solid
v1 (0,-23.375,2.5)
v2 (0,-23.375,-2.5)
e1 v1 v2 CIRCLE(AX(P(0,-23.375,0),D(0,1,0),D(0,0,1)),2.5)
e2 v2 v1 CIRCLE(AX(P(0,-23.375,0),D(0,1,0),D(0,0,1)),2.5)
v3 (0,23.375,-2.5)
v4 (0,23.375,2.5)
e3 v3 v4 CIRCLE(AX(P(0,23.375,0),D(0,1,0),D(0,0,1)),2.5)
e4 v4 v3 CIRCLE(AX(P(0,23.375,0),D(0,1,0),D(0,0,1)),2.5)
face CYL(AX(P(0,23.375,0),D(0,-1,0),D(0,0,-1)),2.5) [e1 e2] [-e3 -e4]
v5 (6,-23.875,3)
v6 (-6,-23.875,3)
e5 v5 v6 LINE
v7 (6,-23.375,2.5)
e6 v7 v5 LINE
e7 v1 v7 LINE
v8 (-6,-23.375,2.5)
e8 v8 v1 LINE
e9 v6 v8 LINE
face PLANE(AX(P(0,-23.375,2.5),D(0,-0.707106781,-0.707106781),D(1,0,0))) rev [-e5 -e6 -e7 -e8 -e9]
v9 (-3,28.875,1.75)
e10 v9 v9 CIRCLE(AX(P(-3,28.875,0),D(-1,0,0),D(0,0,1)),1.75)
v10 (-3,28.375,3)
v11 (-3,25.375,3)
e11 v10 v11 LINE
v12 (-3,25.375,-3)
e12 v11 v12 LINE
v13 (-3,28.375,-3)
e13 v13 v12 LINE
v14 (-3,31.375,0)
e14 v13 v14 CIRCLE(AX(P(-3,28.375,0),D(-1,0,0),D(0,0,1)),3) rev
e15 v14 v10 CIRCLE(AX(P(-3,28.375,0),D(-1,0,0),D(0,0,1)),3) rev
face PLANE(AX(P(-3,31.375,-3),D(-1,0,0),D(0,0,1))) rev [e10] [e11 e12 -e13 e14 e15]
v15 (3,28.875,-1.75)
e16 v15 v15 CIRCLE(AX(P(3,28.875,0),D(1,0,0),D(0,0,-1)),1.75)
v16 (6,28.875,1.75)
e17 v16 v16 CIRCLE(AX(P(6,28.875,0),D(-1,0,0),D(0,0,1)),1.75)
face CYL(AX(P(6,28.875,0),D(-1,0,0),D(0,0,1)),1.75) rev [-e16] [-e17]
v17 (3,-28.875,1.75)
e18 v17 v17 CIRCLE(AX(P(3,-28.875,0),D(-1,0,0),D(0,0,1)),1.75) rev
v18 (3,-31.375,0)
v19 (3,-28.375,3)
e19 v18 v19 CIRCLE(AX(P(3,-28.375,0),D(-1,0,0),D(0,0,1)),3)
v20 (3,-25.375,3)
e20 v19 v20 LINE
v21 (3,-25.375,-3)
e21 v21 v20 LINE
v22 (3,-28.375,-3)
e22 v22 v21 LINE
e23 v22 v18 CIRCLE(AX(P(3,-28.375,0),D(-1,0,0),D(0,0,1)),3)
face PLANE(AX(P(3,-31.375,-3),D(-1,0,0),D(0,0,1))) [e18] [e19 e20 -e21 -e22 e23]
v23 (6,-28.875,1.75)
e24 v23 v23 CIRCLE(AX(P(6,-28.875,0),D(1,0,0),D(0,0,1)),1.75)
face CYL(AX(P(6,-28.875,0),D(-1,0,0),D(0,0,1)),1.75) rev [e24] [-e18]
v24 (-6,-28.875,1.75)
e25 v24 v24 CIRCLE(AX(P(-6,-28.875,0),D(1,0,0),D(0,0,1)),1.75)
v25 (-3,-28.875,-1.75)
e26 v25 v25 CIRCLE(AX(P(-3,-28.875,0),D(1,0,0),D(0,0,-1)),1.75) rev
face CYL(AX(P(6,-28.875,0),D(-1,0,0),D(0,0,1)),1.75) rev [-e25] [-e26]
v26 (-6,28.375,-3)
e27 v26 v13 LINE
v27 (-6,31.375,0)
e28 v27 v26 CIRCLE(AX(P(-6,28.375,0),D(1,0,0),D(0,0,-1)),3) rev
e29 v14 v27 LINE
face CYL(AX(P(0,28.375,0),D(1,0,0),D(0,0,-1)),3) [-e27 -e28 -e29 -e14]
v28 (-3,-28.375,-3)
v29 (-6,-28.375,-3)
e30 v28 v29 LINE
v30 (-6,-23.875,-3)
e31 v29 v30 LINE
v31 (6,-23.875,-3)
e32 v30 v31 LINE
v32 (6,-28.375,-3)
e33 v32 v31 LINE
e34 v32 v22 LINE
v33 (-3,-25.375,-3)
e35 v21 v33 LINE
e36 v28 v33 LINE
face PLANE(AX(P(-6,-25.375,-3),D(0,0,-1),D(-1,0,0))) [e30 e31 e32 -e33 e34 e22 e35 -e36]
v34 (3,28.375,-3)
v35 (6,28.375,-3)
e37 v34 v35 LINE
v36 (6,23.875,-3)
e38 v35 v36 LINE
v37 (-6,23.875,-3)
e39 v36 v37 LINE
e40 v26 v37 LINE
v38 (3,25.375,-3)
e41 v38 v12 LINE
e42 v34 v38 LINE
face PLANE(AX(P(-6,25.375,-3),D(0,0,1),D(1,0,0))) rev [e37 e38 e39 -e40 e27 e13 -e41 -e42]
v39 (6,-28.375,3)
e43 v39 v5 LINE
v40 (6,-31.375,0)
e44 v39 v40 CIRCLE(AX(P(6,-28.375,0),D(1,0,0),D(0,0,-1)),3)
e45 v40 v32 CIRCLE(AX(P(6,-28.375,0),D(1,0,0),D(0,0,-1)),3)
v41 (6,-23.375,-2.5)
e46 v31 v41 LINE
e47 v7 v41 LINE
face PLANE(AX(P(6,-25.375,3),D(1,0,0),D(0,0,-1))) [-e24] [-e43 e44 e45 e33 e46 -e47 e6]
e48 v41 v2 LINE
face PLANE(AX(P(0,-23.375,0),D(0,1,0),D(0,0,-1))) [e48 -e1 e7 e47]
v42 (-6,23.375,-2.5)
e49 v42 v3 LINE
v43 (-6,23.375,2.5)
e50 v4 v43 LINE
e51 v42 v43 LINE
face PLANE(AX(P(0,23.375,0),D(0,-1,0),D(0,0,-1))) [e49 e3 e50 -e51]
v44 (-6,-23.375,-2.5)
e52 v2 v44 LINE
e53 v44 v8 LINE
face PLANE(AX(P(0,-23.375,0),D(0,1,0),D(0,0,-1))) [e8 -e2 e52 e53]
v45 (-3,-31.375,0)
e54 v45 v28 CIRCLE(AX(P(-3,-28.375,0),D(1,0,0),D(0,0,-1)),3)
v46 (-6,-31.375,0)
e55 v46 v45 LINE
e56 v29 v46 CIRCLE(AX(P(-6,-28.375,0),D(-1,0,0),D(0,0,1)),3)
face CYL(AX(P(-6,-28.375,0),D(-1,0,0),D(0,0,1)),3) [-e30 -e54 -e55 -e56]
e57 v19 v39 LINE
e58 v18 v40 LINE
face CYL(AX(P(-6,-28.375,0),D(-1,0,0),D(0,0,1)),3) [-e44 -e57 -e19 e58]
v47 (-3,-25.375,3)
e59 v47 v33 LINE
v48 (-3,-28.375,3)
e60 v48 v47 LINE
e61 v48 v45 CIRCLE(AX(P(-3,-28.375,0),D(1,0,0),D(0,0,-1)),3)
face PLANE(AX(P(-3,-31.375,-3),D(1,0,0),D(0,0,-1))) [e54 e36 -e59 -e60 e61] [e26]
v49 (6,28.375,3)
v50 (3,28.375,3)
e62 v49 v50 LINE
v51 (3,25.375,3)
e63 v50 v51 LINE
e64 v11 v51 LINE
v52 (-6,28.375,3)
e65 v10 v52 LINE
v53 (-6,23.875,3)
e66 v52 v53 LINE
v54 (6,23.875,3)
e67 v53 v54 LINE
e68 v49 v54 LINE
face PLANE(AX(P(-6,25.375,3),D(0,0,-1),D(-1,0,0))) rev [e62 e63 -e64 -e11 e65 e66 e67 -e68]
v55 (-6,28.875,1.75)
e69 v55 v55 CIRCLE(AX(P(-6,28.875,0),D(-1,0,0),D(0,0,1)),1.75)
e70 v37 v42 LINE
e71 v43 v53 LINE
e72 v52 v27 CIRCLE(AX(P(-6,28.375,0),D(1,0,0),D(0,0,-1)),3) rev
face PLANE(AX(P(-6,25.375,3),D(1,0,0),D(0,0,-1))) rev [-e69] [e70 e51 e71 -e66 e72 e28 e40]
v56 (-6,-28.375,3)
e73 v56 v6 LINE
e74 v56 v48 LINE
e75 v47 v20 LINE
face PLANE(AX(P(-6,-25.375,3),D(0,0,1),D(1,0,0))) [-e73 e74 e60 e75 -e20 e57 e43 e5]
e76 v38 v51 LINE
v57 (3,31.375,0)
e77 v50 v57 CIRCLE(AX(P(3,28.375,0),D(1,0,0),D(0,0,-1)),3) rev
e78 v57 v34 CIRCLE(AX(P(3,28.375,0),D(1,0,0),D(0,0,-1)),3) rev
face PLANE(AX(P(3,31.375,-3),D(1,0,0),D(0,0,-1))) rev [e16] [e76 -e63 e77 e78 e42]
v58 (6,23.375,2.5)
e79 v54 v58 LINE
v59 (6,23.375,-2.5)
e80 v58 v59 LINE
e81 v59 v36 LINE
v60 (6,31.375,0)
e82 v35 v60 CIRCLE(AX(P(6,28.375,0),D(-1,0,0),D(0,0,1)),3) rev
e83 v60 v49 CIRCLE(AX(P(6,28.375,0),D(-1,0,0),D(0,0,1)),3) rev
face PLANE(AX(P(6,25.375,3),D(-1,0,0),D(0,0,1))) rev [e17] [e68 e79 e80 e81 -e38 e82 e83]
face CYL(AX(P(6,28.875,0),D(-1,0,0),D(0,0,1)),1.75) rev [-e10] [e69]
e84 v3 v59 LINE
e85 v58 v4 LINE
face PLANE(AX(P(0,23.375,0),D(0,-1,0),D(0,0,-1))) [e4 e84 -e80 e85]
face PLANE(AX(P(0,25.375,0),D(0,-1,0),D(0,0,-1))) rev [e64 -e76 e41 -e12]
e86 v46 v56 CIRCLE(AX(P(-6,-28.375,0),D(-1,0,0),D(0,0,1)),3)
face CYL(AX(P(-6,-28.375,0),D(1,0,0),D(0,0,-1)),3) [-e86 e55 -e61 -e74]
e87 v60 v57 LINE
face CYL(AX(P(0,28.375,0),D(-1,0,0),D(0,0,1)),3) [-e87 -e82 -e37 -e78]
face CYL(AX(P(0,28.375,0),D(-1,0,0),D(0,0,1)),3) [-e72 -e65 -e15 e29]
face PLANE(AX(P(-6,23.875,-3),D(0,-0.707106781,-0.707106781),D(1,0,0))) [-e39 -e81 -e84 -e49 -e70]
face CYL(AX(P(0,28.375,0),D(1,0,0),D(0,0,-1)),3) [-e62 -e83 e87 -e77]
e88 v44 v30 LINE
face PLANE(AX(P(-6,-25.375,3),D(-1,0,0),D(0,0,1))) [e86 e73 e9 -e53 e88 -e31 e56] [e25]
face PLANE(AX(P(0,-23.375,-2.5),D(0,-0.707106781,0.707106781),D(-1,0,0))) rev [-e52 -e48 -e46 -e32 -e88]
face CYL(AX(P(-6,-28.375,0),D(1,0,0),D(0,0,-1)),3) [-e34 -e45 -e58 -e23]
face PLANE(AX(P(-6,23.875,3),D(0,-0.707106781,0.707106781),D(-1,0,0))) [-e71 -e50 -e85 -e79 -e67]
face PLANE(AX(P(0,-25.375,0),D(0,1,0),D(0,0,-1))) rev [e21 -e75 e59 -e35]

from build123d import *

# Parameters (mm, degrees)
SKETCH1_R                = 2.5
BOSS_EXTRUDE1_DEPTH      = 23.375
SKETCH2_W                = 12
SKETCH2_H                = 6
BOSS_EXTRUDE2_DEPTH      = 2
SKETCH3_W                = 3
SKETCH3_H                = 6
BOSS_EXTRUDE3_DEPTH      = 6
SKETCH4_R                = 1.75
CUT_EXTRUDE1_DEPTH       = 34.725222386
FILLET1_R                = 3
CHAMFER2_SIZE            = 0.5
FILLET1_OF_MIRROR1_R     = 3
CHAMFER2_OF_MIRROR1_SIZE = 0.5


with BuildPart() as part:
    # Sketch1 → Boss-Extrude1 (new, symmetric)
    with BuildSketch(Plane(origin=(0, 0, 0), x_dir=(1, 0, 0), z_dir=(0, 1, 0))):
        with Locations(Location((0, 0, 0), (0, 0, 270))):
            Circle(SKETCH1_R)
    extrude(amount=BOSS_EXTRUDE1_DEPTH, both=True)

    # Sketch2 → Boss-Extrude2 (add)
    with BuildSketch(Plane(origin=(0, 23.375, 0), x_dir=(1, 0, 0), z_dir=(0, 1, 0))):
        Rectangle(SKETCH2_W, SKETCH2_H)
    boss_extrude2 = extrude(amount=BOSS_EXTRUDE2_DEPTH)

    # Sketch3 → Boss-Extrude3 (add)
    with BuildSketch(Plane(origin=(0, 25.375, 0), x_dir=(1, 0, 0), z_dir=(0, 1, 0))):
        with Locations((-4.5, 0)):
            Rectangle(SKETCH3_W, SKETCH3_H)
        with Locations((4.5, 0)):
            Rectangle(SKETCH3_W, SKETCH3_H)
    boss_extrude3 = extrude(amount=BOSS_EXTRUDE3_DEPTH)

    # Sketch4 → Cut-Extrude1 (cut, through all)
    with BuildSketch(Plane.ZY.offset(6)):
        with Locations((0, 28.875)):
            Circle(SKETCH4_R)
    cut_extrude1 = extrude(amount=-CUT_EXTRUDE1_DEPTH, mode=Mode.SUBTRACT)

    # Fillet1
    fillet1_edges = [part.edges().sort_by_distance(p)[0] for p in [
        (4.5, 31.375, 3),
        (4.5, 31.375, -3),
        (-4.5, 31.375, 3),
        (-4.5, 31.375, -3),
    ]]
    fillet(fillet1_edges, radius=FILLET1_R - 0.0001)  # a hair under: the kernel refuses the full size

    # Chamfer2
    chamfer2_edges = [part.edges().sort_by_distance(p)[0] for p in [
        (0, 23.375, -3),
        (0, 23.375, 3),
    ]]
    chamfer(chamfer2_edges, length=CHAMFER2_SIZE - 0.0001)  # a hair under: the kernel refuses the full size

    # Mirror1: Boss-Extrude2, Boss-Extrude3, Cut-Extrude1 across plane
    add(boss_extrude2.mirror(Plane.ZX))
    add(boss_extrude3.mirror(Plane.ZX))
    add(cut_extrude1.mirror(Plane.ZX), mode=Mode.SUBTRACT)

    # Fillet1 of Mirror1
    fillet1_of_mirror1_edges = [part.edges().sort_by_distance(p)[0] for p in [
        (4.5, -31.375, 3),
        (4.5, -31.375, -3),
        (-4.5, -31.375, 3),
        (-4.5, -31.375, -3),
    ]]
    fillet(fillet1_of_mirror1_edges, radius=FILLET1_OF_MIRROR1_R - 0.0001)  # a hair under: the kernel refuses the full size

    # Chamfer2 of Mirror1
    chamfer2_of_mirror1_edges = [part.edges().sort_by_distance(p)[0] for p in [
        (0, -23.375, -3),
        (0, -23.375, 3),
    ]]
    chamfer(chamfer2_of_mirror1_edges, length=CHAMFER2_OF_MIRROR1_SIZE - 0.0001)  # a hair under: the kernel refuses the full size


solid = part.part
